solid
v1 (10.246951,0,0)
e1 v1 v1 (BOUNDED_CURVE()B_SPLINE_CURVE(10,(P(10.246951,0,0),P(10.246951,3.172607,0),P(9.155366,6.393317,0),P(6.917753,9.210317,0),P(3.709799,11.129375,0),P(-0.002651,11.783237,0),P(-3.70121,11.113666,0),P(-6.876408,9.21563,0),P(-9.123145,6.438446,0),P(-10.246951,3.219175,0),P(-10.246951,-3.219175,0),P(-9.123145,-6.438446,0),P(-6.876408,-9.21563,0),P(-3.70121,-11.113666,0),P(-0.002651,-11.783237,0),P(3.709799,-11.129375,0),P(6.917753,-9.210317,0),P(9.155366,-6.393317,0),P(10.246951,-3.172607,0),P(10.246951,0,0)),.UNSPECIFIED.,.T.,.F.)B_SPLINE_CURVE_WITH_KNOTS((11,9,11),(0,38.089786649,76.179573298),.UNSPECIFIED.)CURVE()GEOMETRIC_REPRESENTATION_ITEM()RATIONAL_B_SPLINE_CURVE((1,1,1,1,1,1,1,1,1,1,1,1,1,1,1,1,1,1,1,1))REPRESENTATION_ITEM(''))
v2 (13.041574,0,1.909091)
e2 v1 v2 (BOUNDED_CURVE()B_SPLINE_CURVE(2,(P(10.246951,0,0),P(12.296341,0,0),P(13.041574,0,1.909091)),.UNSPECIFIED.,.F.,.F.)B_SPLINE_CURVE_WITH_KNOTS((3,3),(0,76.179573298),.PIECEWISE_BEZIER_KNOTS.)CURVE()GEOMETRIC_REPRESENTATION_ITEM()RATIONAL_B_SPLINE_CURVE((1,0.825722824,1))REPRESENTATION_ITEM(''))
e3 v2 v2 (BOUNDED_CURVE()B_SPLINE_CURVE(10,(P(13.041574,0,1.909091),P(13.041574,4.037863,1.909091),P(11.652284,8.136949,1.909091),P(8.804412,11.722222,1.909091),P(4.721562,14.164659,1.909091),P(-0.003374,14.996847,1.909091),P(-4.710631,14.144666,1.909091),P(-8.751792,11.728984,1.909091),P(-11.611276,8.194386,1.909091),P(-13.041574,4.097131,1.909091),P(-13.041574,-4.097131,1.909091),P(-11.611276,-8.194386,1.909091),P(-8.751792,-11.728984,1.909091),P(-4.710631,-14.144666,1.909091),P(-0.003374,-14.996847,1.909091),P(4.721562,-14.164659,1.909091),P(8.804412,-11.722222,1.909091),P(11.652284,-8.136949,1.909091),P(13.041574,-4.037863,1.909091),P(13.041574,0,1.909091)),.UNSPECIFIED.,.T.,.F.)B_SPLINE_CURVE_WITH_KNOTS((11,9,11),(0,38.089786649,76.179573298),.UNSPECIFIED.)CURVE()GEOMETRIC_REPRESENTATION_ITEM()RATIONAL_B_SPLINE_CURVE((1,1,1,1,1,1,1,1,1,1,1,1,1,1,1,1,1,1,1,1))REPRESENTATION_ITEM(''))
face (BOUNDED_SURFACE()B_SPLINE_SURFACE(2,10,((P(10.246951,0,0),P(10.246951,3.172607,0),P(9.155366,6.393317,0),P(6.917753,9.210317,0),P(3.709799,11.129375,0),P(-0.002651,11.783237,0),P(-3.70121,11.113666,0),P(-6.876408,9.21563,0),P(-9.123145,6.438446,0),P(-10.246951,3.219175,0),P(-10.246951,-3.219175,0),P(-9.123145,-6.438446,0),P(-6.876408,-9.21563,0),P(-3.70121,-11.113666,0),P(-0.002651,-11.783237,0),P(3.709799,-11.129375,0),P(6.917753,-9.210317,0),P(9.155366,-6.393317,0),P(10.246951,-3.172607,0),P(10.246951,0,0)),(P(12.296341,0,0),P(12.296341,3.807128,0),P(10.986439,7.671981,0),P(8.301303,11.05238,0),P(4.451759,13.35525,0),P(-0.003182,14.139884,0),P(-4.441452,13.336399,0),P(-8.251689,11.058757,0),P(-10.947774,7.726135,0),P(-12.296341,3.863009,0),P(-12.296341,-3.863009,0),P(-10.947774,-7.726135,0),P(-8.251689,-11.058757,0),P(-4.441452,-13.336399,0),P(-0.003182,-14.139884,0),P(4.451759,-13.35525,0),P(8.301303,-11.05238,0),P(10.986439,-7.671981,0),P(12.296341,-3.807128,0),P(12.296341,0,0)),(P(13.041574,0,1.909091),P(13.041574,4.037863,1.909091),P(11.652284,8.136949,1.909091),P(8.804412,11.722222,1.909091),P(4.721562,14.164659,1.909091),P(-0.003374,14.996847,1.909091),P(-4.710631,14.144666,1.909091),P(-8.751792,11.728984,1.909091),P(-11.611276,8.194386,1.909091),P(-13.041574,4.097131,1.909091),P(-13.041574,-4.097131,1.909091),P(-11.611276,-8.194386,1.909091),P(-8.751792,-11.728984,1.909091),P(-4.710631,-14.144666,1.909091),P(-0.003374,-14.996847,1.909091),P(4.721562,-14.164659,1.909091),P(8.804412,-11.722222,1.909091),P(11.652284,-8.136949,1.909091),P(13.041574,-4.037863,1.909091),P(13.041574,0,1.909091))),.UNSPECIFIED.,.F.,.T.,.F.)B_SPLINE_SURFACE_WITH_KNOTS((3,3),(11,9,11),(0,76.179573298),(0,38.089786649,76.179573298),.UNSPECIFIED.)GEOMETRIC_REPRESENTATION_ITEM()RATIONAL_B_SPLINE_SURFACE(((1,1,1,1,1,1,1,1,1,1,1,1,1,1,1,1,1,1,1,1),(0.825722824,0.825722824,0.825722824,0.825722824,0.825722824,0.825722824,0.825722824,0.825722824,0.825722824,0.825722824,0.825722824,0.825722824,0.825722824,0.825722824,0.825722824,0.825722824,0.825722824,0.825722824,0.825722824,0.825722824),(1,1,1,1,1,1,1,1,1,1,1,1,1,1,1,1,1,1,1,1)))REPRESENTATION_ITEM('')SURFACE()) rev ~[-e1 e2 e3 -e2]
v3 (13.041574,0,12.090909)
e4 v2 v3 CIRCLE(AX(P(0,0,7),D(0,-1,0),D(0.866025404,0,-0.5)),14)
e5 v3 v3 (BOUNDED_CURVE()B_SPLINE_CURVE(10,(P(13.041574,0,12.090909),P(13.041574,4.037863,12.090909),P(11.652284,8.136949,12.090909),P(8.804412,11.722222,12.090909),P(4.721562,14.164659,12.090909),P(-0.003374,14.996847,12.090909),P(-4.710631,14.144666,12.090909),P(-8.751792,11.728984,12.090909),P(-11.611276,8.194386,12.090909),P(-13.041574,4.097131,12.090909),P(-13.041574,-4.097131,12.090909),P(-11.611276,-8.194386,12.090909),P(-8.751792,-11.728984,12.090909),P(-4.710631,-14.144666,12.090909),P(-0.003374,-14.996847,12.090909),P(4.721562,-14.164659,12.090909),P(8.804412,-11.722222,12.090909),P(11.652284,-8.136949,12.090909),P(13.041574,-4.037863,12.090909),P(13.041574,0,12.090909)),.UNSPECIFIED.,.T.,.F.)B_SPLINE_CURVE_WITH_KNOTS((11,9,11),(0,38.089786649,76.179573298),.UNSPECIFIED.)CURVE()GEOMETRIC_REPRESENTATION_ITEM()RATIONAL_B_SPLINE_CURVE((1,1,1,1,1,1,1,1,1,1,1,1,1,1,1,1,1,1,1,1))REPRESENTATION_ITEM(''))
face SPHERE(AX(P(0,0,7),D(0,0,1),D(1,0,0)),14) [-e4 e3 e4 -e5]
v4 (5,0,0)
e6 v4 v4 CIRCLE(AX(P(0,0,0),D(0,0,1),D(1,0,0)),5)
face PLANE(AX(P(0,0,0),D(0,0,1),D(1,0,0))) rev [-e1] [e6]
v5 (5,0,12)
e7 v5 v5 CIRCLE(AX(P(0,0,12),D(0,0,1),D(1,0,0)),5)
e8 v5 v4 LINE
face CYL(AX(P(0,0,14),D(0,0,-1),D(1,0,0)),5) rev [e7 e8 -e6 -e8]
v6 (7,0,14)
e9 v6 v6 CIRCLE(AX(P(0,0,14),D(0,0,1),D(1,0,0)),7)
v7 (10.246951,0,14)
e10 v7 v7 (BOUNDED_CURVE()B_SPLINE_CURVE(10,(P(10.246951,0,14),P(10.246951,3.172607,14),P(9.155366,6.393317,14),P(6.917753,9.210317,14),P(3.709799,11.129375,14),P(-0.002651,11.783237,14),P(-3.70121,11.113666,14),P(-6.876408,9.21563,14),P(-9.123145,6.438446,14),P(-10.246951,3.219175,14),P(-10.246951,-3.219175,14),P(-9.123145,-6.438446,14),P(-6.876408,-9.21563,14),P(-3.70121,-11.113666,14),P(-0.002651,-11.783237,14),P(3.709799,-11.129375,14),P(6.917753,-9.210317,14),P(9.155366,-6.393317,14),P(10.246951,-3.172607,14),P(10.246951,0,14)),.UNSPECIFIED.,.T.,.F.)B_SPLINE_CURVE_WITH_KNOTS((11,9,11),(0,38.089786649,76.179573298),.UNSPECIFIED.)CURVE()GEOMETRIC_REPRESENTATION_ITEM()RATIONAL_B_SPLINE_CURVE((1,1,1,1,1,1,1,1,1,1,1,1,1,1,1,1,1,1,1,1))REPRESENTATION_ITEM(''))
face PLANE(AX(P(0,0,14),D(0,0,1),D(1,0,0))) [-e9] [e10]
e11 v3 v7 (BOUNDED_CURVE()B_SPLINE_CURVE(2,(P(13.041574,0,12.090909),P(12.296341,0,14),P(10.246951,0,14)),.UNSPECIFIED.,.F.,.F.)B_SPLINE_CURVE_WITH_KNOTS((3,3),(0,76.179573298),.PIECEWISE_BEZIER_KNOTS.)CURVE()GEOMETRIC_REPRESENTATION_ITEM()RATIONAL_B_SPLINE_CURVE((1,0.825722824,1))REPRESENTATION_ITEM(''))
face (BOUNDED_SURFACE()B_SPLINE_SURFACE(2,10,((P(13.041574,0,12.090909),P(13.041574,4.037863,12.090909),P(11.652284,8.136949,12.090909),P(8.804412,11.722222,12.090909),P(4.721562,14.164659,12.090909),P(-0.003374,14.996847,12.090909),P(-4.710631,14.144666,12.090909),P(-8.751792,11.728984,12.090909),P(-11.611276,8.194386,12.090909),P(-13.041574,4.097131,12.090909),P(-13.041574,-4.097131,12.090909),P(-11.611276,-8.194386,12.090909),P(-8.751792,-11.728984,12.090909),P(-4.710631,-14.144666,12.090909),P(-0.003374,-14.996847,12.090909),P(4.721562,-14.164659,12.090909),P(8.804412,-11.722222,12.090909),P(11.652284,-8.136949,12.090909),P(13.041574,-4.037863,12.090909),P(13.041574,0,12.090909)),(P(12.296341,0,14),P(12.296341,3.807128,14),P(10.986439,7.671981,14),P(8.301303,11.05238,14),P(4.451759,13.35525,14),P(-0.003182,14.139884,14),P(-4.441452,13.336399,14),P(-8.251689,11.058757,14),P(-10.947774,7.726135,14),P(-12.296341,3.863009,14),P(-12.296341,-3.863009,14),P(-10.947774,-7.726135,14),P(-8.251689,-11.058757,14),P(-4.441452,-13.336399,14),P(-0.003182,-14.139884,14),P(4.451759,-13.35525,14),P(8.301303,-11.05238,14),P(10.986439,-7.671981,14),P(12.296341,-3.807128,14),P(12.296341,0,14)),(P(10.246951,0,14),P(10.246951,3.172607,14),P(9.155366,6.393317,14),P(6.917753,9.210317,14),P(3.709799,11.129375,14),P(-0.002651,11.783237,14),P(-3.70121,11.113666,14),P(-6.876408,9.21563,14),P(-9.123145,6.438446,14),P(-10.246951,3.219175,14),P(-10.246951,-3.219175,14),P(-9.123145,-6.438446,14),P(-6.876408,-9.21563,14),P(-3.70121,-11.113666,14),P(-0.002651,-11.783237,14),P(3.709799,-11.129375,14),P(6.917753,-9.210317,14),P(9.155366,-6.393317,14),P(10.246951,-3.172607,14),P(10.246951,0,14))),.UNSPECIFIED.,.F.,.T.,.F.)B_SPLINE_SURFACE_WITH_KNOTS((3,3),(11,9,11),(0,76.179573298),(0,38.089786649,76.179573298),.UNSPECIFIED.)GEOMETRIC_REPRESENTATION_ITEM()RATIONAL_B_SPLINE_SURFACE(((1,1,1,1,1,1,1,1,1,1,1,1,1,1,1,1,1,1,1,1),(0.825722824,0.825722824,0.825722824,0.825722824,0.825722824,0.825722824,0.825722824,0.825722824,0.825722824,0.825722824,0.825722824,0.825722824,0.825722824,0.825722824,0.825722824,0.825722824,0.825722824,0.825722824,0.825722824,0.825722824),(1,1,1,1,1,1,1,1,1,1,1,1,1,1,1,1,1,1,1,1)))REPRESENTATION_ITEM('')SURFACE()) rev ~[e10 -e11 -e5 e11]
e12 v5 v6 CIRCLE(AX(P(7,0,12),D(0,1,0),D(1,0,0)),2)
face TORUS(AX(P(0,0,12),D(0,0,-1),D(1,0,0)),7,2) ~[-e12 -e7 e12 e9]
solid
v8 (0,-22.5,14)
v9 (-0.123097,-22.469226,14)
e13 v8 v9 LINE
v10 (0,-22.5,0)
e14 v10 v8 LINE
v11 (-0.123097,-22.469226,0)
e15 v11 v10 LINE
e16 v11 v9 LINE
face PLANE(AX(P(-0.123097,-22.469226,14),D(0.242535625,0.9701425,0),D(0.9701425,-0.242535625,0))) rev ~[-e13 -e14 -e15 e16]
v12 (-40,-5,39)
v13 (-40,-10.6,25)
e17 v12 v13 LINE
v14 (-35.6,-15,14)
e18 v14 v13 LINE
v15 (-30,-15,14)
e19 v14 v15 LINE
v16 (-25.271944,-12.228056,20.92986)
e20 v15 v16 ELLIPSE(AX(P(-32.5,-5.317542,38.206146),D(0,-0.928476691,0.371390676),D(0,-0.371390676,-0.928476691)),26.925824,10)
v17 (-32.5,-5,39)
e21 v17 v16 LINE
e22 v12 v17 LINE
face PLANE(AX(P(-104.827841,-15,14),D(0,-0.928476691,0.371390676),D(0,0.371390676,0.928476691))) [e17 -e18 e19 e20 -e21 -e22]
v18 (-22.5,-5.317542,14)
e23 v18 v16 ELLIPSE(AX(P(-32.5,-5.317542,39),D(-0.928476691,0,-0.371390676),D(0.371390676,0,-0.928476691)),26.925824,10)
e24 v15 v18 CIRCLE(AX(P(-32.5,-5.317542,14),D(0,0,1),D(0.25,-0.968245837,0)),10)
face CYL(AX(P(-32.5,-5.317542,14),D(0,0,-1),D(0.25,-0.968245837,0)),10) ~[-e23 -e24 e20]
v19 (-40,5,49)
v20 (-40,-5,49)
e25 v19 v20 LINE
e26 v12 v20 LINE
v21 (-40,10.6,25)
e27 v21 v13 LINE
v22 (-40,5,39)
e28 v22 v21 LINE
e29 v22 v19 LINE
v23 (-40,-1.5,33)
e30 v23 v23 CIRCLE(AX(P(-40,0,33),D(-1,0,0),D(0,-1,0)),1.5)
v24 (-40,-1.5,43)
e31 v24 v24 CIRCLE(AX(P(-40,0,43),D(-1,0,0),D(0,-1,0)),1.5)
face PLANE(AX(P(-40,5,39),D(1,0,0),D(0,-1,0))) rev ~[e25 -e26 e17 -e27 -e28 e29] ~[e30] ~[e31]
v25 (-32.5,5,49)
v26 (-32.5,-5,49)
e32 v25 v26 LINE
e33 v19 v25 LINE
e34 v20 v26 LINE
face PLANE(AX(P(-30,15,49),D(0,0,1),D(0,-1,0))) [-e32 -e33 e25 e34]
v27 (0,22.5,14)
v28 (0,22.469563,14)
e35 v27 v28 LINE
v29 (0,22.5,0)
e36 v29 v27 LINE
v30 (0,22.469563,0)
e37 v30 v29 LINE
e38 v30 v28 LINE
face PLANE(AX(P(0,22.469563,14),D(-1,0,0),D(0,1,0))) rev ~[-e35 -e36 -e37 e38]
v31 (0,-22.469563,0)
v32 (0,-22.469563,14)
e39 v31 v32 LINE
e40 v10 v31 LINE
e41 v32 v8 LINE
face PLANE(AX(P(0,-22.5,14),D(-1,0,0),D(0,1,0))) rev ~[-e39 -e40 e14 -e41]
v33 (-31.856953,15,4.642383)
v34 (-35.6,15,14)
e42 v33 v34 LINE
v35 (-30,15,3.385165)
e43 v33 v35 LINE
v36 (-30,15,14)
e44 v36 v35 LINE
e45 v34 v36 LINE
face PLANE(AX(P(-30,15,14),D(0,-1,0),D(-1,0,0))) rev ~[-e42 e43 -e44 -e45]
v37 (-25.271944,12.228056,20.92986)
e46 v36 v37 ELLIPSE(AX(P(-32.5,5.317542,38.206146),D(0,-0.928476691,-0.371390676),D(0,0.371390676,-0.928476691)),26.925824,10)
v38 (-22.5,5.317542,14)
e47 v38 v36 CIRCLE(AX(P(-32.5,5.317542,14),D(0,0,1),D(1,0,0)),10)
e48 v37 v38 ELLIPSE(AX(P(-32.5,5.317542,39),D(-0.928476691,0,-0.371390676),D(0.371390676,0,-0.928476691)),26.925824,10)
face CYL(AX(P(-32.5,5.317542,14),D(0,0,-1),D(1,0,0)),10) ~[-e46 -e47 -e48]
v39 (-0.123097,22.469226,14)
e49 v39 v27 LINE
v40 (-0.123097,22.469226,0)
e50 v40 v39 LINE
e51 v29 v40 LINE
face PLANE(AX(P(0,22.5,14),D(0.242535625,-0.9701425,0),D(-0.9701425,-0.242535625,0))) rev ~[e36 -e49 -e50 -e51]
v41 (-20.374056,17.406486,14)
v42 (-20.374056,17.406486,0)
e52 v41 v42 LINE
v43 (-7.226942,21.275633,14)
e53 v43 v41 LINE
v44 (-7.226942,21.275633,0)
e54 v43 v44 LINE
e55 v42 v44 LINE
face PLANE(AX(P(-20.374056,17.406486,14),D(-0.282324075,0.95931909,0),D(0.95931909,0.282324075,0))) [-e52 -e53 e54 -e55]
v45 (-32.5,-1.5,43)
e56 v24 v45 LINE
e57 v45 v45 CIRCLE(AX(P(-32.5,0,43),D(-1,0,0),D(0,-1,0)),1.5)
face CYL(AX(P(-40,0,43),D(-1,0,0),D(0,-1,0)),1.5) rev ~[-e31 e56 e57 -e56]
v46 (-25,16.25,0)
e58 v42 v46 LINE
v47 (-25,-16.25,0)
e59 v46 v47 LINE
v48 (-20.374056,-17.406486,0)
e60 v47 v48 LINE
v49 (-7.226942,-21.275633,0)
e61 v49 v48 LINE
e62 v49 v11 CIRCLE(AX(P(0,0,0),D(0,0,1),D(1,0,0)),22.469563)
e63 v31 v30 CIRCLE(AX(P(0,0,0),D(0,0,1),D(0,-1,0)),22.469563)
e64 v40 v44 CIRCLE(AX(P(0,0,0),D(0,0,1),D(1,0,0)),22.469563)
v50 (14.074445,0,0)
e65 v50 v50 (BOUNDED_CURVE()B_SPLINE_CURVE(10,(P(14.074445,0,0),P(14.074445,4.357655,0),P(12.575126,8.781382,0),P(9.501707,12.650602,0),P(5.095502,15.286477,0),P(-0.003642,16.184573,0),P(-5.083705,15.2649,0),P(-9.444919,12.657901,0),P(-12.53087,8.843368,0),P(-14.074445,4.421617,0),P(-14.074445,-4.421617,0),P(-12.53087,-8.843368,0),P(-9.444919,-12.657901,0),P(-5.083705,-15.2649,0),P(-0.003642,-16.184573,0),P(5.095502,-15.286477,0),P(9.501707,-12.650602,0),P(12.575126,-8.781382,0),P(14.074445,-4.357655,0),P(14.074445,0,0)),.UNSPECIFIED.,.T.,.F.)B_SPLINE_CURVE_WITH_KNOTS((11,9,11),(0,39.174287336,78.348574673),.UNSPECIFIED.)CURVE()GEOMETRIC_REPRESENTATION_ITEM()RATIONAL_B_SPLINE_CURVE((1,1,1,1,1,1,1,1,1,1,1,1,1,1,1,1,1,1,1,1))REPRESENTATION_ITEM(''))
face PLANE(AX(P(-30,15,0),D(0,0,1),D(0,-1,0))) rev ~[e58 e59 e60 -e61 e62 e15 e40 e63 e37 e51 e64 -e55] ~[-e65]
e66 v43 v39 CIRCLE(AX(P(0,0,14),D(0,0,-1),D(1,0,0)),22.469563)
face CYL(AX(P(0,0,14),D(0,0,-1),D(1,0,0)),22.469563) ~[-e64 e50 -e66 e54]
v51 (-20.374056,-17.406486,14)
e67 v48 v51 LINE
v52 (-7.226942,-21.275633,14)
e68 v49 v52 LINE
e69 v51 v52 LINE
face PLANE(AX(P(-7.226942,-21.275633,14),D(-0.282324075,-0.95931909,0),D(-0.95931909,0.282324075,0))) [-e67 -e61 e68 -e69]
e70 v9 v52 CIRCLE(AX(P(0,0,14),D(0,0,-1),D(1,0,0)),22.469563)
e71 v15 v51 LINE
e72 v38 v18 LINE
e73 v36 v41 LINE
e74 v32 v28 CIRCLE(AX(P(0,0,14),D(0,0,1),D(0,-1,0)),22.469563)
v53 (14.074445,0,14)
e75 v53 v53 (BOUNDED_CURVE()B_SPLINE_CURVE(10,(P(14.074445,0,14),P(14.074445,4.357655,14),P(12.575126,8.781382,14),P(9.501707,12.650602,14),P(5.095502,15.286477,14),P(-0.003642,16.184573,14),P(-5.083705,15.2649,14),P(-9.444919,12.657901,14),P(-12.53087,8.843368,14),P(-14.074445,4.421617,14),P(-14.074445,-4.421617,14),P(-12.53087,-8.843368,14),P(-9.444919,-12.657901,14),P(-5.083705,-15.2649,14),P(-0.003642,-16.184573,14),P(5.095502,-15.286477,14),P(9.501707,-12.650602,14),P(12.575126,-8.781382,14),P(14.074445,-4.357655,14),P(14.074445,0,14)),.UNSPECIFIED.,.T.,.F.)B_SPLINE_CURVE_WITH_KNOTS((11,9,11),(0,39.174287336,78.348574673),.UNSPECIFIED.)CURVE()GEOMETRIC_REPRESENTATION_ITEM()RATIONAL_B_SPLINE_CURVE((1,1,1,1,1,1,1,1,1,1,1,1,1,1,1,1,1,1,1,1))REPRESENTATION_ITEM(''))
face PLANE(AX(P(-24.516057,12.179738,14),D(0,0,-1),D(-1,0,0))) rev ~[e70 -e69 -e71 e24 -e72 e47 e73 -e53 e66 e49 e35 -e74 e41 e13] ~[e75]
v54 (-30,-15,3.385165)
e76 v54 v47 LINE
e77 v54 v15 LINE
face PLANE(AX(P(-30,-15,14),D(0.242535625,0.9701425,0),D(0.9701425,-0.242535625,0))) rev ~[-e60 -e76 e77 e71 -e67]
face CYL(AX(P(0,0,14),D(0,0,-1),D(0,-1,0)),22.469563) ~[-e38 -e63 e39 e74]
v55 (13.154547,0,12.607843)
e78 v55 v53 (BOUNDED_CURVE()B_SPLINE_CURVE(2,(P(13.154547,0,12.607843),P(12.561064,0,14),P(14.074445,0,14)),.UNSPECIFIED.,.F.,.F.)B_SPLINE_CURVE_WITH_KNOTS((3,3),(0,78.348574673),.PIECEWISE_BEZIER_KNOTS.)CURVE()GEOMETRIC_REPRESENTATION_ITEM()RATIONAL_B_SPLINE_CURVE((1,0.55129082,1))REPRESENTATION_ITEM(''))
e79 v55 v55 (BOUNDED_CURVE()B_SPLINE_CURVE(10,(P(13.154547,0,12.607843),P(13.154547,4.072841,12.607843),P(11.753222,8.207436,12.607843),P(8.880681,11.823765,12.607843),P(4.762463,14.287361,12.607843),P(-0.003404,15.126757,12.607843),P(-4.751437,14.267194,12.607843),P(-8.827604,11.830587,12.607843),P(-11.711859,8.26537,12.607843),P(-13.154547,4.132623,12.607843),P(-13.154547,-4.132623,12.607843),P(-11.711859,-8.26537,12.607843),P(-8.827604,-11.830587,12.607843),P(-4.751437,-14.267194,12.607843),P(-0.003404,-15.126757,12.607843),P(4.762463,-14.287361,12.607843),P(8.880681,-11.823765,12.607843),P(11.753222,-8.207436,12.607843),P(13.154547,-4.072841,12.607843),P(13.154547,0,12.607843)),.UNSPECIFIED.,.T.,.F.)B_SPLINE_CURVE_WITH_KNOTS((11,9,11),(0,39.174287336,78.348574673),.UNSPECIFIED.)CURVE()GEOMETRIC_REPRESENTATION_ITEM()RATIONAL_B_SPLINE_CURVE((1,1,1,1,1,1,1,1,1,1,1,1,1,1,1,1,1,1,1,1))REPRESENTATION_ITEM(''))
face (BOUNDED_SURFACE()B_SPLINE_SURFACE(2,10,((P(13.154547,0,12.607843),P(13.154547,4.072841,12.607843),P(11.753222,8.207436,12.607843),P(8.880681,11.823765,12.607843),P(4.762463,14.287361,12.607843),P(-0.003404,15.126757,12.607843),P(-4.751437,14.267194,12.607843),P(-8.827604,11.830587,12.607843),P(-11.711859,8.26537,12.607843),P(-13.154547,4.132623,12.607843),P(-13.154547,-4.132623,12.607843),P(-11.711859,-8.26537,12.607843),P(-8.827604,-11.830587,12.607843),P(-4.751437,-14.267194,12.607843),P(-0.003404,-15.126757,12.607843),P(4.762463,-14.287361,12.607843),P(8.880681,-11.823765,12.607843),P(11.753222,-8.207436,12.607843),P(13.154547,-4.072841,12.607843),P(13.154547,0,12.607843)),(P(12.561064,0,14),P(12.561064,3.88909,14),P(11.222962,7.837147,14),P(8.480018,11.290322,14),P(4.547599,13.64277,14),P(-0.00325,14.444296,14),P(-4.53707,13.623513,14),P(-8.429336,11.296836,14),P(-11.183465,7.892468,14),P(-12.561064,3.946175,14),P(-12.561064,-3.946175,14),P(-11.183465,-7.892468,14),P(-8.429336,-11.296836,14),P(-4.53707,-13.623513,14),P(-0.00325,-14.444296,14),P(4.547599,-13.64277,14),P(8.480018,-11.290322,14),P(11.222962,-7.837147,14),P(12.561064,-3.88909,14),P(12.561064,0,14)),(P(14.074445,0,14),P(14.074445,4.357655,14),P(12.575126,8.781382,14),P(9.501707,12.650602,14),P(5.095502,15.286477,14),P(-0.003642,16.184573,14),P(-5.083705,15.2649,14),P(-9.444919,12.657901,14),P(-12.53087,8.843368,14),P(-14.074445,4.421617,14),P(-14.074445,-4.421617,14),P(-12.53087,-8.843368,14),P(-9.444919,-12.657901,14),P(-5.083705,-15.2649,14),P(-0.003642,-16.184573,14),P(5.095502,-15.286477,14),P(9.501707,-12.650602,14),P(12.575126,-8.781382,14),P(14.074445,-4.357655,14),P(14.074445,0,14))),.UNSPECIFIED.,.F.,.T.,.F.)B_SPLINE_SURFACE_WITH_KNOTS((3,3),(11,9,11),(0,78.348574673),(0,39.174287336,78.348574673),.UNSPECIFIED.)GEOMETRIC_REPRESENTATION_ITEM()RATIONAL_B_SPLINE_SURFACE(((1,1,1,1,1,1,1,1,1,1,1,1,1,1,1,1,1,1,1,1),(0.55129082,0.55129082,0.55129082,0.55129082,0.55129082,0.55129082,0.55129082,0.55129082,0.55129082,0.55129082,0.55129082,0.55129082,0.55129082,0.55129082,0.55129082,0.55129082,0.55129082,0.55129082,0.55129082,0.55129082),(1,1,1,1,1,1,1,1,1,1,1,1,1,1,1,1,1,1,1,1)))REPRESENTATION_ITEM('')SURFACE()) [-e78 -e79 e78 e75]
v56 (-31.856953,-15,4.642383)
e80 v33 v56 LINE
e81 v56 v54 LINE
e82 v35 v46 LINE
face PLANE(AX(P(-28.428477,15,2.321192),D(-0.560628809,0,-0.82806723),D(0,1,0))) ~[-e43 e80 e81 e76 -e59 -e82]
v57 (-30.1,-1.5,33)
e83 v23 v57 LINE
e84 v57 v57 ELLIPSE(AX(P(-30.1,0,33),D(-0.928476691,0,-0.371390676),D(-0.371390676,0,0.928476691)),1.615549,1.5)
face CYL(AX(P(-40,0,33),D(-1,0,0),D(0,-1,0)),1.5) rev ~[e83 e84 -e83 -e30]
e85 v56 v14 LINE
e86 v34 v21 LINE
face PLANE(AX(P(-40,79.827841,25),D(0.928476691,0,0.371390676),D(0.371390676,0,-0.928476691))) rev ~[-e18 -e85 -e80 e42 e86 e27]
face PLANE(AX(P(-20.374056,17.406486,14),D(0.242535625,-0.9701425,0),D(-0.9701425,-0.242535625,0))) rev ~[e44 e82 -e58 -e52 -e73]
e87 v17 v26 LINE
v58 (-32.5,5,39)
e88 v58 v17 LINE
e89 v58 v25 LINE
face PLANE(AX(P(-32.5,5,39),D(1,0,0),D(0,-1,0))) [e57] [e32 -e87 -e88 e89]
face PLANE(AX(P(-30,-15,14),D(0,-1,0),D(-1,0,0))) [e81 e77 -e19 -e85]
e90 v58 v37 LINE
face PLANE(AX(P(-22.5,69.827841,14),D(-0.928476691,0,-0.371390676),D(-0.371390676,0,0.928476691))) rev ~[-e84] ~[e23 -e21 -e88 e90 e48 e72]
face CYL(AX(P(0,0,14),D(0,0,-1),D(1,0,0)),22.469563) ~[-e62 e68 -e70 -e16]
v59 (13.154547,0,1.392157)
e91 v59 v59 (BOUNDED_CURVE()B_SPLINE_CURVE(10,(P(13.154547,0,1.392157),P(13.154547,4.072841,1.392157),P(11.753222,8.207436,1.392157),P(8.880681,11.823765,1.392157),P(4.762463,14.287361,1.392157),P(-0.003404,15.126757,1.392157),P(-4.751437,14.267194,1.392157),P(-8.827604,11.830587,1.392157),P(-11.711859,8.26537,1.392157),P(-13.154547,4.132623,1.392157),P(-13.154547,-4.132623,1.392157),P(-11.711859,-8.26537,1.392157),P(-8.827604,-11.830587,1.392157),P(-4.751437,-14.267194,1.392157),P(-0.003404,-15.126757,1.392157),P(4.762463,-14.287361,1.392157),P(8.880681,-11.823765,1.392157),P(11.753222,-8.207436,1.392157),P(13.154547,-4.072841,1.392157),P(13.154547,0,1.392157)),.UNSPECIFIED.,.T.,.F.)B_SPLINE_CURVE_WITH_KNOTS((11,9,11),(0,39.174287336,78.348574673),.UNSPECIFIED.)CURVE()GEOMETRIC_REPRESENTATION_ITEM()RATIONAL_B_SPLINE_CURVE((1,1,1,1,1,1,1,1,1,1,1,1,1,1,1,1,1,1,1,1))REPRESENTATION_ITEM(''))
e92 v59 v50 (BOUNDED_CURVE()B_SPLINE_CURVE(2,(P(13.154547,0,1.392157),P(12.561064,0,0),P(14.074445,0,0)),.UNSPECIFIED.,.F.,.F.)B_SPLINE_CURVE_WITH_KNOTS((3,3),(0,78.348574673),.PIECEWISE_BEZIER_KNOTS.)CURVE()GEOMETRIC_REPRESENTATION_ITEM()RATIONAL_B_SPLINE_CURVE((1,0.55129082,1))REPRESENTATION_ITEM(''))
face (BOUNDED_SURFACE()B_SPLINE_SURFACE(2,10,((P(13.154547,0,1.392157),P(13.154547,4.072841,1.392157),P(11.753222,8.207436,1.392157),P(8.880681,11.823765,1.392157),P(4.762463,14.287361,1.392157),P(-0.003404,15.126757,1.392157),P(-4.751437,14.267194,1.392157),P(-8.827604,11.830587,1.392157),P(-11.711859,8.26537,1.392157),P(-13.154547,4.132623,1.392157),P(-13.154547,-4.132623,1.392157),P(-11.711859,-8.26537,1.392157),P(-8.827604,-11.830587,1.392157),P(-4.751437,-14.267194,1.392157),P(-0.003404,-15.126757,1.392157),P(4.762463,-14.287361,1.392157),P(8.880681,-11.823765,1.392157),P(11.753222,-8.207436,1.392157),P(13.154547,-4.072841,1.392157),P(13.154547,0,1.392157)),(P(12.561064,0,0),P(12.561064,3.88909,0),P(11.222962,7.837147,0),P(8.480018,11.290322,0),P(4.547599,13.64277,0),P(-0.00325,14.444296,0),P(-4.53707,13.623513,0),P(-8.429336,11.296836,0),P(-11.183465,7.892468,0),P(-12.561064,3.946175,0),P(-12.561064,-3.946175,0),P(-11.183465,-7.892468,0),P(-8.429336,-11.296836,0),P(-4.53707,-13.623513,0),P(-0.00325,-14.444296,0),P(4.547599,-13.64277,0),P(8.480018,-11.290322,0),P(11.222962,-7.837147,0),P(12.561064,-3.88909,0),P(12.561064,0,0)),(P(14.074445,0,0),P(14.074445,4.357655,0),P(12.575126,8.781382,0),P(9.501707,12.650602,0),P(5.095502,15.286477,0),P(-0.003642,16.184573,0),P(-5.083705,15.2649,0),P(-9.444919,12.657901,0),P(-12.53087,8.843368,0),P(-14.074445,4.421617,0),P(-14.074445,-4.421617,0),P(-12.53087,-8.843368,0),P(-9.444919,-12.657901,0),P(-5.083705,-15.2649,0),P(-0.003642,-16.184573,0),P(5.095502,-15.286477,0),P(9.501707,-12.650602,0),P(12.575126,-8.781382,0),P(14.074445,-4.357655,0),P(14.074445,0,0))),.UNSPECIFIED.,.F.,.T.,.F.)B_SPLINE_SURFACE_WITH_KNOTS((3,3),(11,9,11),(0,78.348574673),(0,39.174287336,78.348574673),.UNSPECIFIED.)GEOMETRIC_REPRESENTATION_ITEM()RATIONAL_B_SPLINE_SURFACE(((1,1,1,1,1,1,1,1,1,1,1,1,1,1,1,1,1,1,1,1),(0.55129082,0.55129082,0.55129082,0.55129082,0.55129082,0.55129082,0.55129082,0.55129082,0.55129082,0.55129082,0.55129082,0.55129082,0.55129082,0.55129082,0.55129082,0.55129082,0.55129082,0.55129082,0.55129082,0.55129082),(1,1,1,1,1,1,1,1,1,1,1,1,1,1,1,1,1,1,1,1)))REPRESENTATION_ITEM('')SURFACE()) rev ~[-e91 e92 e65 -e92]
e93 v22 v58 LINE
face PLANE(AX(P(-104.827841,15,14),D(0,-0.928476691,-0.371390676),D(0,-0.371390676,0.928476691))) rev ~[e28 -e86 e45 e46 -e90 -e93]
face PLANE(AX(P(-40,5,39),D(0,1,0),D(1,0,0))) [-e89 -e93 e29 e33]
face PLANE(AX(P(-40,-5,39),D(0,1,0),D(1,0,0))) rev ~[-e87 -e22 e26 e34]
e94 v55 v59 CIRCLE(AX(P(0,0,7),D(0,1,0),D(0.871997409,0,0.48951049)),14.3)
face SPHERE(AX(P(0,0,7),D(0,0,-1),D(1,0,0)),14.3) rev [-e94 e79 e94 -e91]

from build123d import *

# Parameters (mm, degrees)
F3_R         = 3
F4_R         = 1
F6_DEPTH     = 14
F7_T1_DEPTH  = 14
F8_DEPTH     = 10
F9_DEPTH     = 25
F10_W        = 50
F10_H        = 100
F11_DEPTH    = 50
F12_T1_DEPTH = 53.8936459138
F13_T1_DEPTH = 139.6556819565
F14_T4_DEPTH = 139.6556819565
F15_T1_DEPTH = 159.6556819565
F16_SIZE     = 5
F17_DEPTH    = 10
F18_R        = 1.5
F19_DEPTH    = 25
F20_R        = 2


# Not quite as in the source:
# - a fillet or chamfer that OpenCascade refuses, or shapes differently, is made with other operations: its cross-section is extruded or revolved along the edge and cut away or added


with BuildPart() as f2:
    # F0 (on Front) → F2 (revolve)
    with BuildSketch(Plane.XZ):
        with BuildLine():
            Line((5, 0), (12.124355653, 0))
            ThreePointArc((12.124355653, 0), (14, 7), (12.124355653, 14))
            Line((12.124355653, 14), (5, 14))
            Line((5, 14), (5, 0))
        make_face()
    revolve(axis=Axis((0, 0, 12.6064065844), (0, 0, 1)))

    # F3
    f3_edges = [f2.edges().sort_by_distance(p)[0] for p in [
        (-12.124356, 0, 14),
        (-12.124356, 0, 0),
    ]]
    fillet(f3_edges, radius=F3_R)

    # F20
    f20_edges = [f2.edges().sort_by_distance(p)[0] for p in [
        (-5, 0, 14),
    ]]
    fillet(f20_edges, radius=F20_R)


with BuildPart() as f2b:
    # F0 (on Front) → F2, piece 2 (revolve)
    with BuildSketch(Plane.XZ):
        with BuildLine():
            ThreePointArc((12.4695629434, 14), (14.3, 7), (12.4695629434, 0))
            Line((12.4695629434, 0), (22.4695629434, 0))
            Line((22.4695629434, 0), (22.4695629434, 14))
            Line((22.4695629434, 14), (12.4695629434, 14))
        make_face()
    revolve(axis=Axis((0, 0, 12.6064065844), (0, 0, 1)))

    # F4
    f4_edges = [f2b.edges().sort_by_distance(p)[0] for p in [
        (-12.469563, 0, 14),
        (-12.469563, 0, 0),
    ]]
    fillet(f4_edges, radius=F4_R)

    # F5 (on Top) → F6 (join)
    with BuildSketch(Plane.XY):
        Polygon((-15.7520063221, 9.0848943219), (0, 19.2215126008), (0, 22.5), (-30, 15), (-30, -15), (0, -22.5), (0, -18.8700128347), (-15.7520063221, -9.3158083037), align=None)
    extrude(amount=F6_DEPTH)

    # F7: chamfer of 20 on 2 edges, made by hand

    # F7_s2 → F7_t1 (join)
    with BuildSketch(Plane.XY):
        with BuildLine():
            Line((-6.4594864096, -21.5014925715), (-21.141510961, -17.1806268176))
            Line((-21.141510961, -17.1806268176), (-21.044496711, -16.7925698176))
            ThreePointArc((-21.044496711, -16.7925698176), (-15.7103098501, -18.1601119749), (-10.3681240616, -19.495658422))
            Line((-10.3681240616, -19.495658422), (-10.278839391, -19.5297483161))
            ThreePointArc((-10.278839391, -19.5297483161), (-8.3538564635, -20.4274004881), (-6.33083341, -21.1227467389))
            Line((-6.33083341, -21.1227467389), (-6.4594864096, -21.5014925715))
        make_face()
        with BuildLine():
            Line((-21.141510961, 17.1806268176), (-6.4594864096, 21.5014925715))
            Line((-6.4594864096, 21.5014925715), (-6.33083341, 21.1227467389))
            ThreePointArc((-6.33083341, 21.1227467389), (-8.3538564635, 20.4274004881), (-10.278839391, 19.5297483161))
            Line((-10.278839391, 19.5297483161), (-10.3681240616, 19.495658422))
            ThreePointArc((-10.3681240616, 19.495658422), (-15.7103098501, 18.1601119749), (-21.044496711, 16.7925698176))
            Line((-21.044496711, 16.7925698176), (-21.141510961, 17.1806268176))
        make_face()
    extrude(amount=F7_T1_DEPTH)

    # F8 (add): a face of the model
    f8_faces = [f2b.faces().sort_by_distance(p)[0] for p in [
        (-30, 0, 7),
    ]]
    extrude(f8_faces, amount=F8_DEPTH)

    # F9 (add): a face of the model
    f9_faces = [f2b.faces().sort_by_distance(p)[0] for p in [
        (21.6996638372, 0, 14),
    ]]
    extrude(f9_faces, amount=F9_DEPTH)

    # F10 (on Front) → F11 (cut, symmetric)
    with BuildSketch(Plane.XZ):
        with Locations((2.5, 64)):
            Rectangle(F10_W, F10_H)
    extrude(amount=F11_DEPTH, both=True, mode=Mode.SUBTRACT)

    # F12: fillet of radius 10 on 2 edges, made by hand

    # F12_s2 → F12_t1 (cut)
    with BuildSketch(Plane.XY.offset(14)):
        with BuildLine():
            ThreePointArc((-30, -15), (-24.5943058496, -11.4412659914), (-22.5, -5.3175416345))
            Line((-22.5, -5.3175416345), (-22.5, -16.875))
            Line((-22.5, -16.875), (-30, -15))
        make_face()
        with BuildLine():
            ThreePointArc((-22.5, 5.3175416345), (-24.5943058496, 11.4412659914), (-30, 15))
            Line((-30, 15), (-22.5, 16.875))
            Line((-22.5, 16.875), (-22.5, 5.3175416345))
        make_face()
    extrude(amount=F12_T1_DEPTH, mode=Mode.SUBTRACT)

    # F13: chamfer of 10 x 25 on 2 edges, made by hand

    # F13_s2 → F13_t1 (cut)
    with BuildSketch(Plane.YZ.offset(-104.8278409783)):
        Polygon((-15, 14), (-5, 39), (-15, 39), align=None)
        Polygon((15, 14), (5, 39), (15, 39), align=None)
    extrude(amount=F13_T1_DEPTH, mode=Mode.SUBTRACT)

    # F14: chamfer of 25 x 10 on 1 edges, made by hand


with BuildPart() as f14_tool2:
    # F14_s3 → F14_t4 (new body)
    with BuildSketch(Plane.XZ.offset(-69.8278409783)):
        Polygon((-22.5, 14), (-32.5, 39), (-22.5, 39), align=None)
    extrude(amount=F14_T4_DEPTH)

    split(bisect_by=Plane.XY.offset(14), keep=Keep.TOP)


with BuildPart() as f2b_1:
    add(f2b.part)

    # F14_t1: cut F14_tool2
    add(f14_tool2.part, mode=Mode.SUBTRACT)

    # F15: chamfer of 10 x 25 on 1 edges, made by hand

    # F15_s2 → F15_t1 (cut)
    with BuildSketch(Plane.XZ.offset(-79.8278409783)):
        Polygon((-40, 25), (-30, 0), (-40, 0), align=None)
    extrude(amount=F15_T1_DEPTH, mode=Mode.SUBTRACT)

    # F16
    f16_edges = [f2b_1.edges().sort_by_distance(p)[0] for p in [
        (-30, 0, 0),
    ]]
    chamfer(f16_edges, length=F16_SIZE)

    # F17 (add): a face of the model
    f17_faces = [f2b_1.faces().sort_by_distance(p)[0] for p in [
        (-36.25, 0, 39),
    ]]
    extrude(f17_faces, amount=F17_DEPTH)

    # F18 (on face) → F19 (cut)
    with BuildSketch(Plane(origin=(-40, 0, 0), x_dir=(0, -1, 0), z_dir=(-1, 0, 0))):
        with Locations((0, 33)):
            Circle(F18_R)
        with Locations((0, 43)):
            Circle(F18_R)
    extrude(amount=-F19_DEPTH, mode=Mode.SUBTRACT)


solid = Compound([f2.part, f2b_1.part])
